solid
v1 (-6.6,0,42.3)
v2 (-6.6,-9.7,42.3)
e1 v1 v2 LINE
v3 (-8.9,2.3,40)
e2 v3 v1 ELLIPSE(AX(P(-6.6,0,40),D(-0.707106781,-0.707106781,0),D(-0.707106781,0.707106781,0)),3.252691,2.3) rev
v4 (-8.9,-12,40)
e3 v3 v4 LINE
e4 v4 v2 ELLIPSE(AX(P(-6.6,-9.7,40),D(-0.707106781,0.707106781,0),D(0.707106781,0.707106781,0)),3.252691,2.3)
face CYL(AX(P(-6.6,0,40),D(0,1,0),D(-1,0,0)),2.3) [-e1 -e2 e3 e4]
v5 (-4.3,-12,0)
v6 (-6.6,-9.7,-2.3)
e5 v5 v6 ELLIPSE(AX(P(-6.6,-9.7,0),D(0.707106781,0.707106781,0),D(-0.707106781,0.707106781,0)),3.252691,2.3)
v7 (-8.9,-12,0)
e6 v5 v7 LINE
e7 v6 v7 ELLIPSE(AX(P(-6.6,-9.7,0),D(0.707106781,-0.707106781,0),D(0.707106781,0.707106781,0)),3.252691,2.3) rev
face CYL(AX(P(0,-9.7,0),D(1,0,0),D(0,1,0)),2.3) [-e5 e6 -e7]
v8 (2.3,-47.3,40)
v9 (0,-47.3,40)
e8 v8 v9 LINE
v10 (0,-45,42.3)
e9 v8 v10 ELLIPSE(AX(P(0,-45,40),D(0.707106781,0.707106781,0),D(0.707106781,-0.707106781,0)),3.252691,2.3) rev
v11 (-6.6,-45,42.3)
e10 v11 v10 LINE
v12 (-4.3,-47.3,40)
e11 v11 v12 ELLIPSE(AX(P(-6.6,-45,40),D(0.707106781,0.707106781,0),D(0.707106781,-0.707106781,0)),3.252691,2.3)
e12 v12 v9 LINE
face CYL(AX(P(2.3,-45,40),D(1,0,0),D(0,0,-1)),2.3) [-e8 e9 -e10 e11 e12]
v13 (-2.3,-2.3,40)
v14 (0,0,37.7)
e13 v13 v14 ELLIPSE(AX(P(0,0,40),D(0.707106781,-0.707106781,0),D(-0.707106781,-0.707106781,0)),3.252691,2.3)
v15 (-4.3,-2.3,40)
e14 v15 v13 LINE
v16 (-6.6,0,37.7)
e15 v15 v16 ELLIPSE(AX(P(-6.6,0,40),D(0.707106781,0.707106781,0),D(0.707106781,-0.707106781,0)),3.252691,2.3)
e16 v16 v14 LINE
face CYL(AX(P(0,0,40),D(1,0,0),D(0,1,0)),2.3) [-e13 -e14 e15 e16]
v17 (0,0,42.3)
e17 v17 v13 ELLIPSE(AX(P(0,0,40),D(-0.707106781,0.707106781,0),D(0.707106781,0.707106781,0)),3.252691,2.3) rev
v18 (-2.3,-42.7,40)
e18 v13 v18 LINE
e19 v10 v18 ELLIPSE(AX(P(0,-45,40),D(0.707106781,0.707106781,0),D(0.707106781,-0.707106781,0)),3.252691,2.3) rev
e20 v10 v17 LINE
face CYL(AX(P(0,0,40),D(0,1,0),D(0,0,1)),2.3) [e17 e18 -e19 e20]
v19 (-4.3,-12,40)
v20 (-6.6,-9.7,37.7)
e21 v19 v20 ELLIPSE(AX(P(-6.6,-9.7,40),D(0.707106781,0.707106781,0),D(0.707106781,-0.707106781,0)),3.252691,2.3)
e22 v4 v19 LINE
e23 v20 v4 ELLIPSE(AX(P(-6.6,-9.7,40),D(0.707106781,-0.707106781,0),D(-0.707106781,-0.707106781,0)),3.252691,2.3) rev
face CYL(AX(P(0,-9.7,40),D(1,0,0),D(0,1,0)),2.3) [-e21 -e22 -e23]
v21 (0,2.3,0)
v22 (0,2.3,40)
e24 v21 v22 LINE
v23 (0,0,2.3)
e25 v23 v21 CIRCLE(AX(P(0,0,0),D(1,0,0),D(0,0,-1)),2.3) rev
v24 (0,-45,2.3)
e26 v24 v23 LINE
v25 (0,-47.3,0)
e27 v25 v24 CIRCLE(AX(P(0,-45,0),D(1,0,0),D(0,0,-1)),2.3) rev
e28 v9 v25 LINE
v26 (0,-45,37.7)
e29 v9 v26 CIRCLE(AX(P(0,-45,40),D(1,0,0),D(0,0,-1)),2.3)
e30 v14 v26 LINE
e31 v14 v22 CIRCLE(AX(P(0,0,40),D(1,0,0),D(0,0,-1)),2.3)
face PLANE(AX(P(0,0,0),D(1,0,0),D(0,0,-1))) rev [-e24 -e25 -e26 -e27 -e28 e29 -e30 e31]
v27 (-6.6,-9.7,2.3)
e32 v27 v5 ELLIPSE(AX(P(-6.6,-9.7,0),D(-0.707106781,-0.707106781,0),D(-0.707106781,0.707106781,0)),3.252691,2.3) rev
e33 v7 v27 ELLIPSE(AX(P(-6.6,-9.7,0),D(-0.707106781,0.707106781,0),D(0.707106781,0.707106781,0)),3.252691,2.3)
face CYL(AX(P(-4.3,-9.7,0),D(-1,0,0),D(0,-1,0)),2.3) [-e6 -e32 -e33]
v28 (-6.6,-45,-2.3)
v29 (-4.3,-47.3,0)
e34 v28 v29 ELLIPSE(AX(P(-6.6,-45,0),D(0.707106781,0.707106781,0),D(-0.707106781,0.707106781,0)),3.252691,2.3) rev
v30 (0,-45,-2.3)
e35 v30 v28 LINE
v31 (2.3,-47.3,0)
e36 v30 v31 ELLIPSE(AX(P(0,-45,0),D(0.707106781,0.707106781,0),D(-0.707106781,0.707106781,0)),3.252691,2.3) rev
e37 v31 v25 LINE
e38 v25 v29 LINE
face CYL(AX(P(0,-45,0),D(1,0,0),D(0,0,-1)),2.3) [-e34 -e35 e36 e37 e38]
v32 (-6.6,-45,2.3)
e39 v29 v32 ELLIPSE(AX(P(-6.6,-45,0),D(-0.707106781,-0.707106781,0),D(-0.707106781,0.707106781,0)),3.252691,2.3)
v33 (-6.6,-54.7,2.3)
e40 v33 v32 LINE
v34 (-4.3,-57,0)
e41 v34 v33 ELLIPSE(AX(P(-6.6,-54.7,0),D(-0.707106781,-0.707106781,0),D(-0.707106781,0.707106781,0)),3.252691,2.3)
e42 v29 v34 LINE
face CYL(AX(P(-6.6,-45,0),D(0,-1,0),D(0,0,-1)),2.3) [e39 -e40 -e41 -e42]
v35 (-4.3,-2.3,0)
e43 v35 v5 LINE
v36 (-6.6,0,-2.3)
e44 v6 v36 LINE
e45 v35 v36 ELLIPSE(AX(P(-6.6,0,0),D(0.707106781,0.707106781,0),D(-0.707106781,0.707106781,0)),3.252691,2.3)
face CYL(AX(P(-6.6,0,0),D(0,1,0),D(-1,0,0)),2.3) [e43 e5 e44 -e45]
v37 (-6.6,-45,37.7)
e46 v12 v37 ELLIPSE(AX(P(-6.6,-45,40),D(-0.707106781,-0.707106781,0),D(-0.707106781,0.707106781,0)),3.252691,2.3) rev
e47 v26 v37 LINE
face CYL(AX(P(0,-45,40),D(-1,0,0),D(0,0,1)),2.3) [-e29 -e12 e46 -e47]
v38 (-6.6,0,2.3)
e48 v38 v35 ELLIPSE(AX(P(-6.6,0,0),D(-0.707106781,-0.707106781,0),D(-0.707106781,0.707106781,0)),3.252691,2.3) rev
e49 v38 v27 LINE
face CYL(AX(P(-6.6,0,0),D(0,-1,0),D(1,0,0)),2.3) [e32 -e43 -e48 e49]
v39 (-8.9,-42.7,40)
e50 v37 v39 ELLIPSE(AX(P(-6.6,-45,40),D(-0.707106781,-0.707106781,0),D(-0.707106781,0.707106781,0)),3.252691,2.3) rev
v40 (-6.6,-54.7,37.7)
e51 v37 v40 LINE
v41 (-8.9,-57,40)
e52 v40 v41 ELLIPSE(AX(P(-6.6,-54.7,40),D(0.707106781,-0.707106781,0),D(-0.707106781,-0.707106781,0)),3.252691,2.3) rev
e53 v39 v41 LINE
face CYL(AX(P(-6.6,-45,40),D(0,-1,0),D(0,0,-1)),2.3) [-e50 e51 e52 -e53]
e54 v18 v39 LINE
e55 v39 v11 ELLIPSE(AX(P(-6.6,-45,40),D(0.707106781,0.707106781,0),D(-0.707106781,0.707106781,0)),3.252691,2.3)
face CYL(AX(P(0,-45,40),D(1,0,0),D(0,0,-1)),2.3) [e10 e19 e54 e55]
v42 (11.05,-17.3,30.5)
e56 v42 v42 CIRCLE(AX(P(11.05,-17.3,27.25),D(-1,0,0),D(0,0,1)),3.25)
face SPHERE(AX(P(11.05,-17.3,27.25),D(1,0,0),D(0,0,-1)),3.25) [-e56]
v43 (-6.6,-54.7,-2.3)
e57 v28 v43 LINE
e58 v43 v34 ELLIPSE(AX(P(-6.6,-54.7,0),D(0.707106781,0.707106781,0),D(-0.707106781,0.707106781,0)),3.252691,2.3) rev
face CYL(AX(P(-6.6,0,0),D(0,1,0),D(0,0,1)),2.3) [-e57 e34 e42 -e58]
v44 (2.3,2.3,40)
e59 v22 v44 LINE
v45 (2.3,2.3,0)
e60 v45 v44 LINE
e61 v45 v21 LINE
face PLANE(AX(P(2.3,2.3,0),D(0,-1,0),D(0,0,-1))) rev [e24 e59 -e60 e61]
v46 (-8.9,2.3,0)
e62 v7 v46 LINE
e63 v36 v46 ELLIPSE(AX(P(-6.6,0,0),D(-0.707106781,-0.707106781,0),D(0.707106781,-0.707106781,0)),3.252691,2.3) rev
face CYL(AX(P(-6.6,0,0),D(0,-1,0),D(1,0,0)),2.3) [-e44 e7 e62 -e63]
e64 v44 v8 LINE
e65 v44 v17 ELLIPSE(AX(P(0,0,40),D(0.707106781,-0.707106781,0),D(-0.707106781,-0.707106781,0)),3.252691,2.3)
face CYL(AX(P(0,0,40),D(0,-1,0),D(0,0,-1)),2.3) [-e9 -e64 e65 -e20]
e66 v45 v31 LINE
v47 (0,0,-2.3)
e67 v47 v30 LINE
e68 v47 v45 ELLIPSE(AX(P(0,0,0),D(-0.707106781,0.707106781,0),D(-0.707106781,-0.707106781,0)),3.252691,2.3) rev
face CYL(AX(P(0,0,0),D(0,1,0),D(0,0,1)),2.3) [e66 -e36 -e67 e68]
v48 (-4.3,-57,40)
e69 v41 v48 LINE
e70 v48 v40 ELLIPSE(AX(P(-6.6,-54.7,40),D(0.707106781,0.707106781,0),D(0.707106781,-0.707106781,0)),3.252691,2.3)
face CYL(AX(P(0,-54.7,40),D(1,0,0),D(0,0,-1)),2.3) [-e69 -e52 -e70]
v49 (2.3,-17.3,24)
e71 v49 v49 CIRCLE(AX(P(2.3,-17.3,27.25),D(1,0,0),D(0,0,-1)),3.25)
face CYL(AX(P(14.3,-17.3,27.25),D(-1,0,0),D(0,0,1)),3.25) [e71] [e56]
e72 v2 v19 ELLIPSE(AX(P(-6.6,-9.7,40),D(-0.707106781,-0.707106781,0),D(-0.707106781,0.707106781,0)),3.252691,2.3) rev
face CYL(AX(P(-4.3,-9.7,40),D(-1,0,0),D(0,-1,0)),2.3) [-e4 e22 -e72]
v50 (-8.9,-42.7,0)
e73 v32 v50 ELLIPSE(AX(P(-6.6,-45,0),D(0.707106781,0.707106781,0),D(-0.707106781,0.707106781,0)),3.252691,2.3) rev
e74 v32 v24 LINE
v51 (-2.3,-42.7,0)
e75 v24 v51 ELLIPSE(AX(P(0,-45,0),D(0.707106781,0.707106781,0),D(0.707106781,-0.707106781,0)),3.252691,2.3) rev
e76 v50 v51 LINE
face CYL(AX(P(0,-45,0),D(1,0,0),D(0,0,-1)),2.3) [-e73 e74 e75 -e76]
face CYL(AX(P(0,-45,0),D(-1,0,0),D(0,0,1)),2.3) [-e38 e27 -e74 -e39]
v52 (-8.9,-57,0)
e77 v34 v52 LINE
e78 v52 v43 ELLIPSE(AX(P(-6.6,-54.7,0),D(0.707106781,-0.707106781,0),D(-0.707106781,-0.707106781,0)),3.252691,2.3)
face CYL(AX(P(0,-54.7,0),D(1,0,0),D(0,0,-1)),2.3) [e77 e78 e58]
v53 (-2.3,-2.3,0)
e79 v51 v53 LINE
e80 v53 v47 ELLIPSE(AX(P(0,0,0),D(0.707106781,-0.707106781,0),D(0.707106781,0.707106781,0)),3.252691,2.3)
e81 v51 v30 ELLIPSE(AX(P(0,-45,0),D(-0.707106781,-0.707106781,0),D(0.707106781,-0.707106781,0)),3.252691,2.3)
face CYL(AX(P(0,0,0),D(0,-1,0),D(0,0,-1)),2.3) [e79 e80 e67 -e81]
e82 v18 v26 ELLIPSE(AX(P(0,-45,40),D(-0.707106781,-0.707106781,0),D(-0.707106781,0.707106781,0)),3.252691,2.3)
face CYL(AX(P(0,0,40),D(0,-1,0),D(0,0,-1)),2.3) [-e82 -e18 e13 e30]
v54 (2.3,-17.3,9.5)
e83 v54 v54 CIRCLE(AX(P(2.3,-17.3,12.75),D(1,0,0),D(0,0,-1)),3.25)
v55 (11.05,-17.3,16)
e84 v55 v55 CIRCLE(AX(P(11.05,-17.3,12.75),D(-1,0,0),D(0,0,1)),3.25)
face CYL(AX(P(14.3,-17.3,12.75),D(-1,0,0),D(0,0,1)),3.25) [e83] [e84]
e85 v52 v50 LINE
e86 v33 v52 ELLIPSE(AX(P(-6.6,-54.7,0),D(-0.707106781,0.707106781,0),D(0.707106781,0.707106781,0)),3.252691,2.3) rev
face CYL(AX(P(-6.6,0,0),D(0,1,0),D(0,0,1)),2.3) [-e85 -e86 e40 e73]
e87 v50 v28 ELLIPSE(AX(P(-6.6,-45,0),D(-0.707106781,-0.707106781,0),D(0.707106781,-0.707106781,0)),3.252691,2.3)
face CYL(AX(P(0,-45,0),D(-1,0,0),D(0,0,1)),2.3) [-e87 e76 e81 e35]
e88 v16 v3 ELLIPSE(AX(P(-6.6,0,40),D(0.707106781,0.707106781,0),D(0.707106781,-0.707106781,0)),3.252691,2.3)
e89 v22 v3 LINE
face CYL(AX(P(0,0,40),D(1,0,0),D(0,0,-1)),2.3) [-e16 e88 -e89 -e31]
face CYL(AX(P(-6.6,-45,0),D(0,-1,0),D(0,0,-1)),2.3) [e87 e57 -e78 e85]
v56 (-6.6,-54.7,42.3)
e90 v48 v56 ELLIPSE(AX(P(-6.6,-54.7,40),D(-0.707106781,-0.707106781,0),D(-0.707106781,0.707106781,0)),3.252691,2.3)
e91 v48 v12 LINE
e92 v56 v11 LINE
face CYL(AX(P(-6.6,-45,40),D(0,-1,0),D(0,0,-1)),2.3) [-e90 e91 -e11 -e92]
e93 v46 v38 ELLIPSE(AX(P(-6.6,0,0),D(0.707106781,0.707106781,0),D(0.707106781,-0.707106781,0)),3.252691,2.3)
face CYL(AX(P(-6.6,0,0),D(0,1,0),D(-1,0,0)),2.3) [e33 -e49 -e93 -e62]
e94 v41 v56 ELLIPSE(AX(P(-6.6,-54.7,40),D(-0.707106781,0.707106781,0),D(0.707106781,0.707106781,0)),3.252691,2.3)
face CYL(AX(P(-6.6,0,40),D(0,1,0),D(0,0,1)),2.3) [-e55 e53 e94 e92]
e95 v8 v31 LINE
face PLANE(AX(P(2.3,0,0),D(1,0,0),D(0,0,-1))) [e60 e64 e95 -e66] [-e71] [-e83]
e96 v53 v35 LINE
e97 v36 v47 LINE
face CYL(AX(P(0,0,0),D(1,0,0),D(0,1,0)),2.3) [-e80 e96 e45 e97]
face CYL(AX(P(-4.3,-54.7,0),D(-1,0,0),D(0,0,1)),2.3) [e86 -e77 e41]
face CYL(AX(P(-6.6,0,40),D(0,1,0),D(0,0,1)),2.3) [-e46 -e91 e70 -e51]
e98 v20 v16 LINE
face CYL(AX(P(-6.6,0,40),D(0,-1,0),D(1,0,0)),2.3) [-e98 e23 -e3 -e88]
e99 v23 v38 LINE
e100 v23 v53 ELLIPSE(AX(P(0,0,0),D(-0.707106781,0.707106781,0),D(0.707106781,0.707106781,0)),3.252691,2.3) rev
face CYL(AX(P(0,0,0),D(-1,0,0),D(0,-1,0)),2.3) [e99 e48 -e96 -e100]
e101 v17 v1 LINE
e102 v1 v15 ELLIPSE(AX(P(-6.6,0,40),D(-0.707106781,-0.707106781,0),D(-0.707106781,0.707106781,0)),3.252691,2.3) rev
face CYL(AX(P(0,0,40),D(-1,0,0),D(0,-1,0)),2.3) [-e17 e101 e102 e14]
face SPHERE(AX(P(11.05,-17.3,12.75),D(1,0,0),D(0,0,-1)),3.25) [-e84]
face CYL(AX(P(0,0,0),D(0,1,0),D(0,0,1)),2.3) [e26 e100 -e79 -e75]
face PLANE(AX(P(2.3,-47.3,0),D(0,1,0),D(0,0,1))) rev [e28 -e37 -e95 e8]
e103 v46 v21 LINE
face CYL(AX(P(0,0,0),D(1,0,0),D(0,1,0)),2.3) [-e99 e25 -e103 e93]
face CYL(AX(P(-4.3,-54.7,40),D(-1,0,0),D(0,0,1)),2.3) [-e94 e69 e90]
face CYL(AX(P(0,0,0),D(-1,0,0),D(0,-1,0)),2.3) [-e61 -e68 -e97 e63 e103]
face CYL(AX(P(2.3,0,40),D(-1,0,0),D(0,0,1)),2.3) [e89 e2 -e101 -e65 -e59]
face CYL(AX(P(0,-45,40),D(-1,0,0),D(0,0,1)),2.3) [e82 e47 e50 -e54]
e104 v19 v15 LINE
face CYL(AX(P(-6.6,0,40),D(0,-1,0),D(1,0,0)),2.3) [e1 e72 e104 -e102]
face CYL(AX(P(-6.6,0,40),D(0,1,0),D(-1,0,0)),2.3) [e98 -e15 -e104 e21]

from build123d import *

# Parameters (mm, degrees)
EXTRU_MINCE1_DEPTH         = 2.3
CONG_1_R                   = 2.3
ESQUISSE2_W                = 40
ESQUISSE2_H                = 49.6
BOSS_EXTRU_1_DEPTH         = 2.3
R_P_TITION_LIN_AIRE1_COUNT = 2
R_P_TITION_LIN_AIRE1_PITCH = 40
CONG_2_R                   = 2.3
ESQUISSE3_R                = 3.25
BOSS_EXTRU_2_DEPTH         = 12
CONG_3_R                   = 3.25


with BuildPart() as part:
    # Esquisse1 → Extru.-Mince1 (new, symmetric)
    with BuildSketch(Plane.XY):
        Polygon((-4.3, -57), (-4.3, -47.3), (2.3, -47.3), (2.3, 2.3), (-8.9, 2.3), (-8.9, -12), (-4.3, -12), (-4.3, -2.3), (-2.3, -2.3), (-2.3, -42.7), (-8.9, -42.7), (-8.9, -57), align=None)
    extru_mince1 = extrude(amount=EXTRU_MINCE1_DEPTH, both=True)

    # Congé1
    cong_1_edges = [part.edges().sort_by_distance(p)[0] for p in [
        (-6.6, -57, -2.3),
        (-4.3, -52.15, -2.3),
        (-1, -47.3, -2.3),
        (2.3, -22.5, -2.3),
        (-3.3, 2.3, -2.3),
        (-8.9, -4.85, -2.3),
        (-6.6, -12, -2.3),
        (-4.3, -7.15, -2.3),
        (-3.3, -2.3, -2.3),
        (-2.3, -22.5, -2.3),
        (-5.6, -42.7, -2.3),
        (-8.9, -49.85, -2.3),
        (-5.6, -42.7, 2.3),
        (-2.3, -22.5, 2.3),
        (-3.3, -2.3, 2.3),
        (-4.3, -7.15, 2.3),
        (-6.6, -12, 2.3),
        (-8.9, -4.85, 2.3),
        (-3.3, 2.3, 2.3),
        (2.3, -22.5, 2.3),
        (-1, -47.3, 2.3),
        (-4.3, -52.15, 2.3),
        (-6.6, -57, 2.3),
        (-8.9, -49.85, 2.3),
    ]]
    fillet(cong_1_edges, radius=CONG_1_R - 0.0001)  # a hair under: the kernel refuses the full size

    # Esquisse2 → Boss.-Extru.1 (add)
    with BuildSketch(Plane(origin=(0, 0, 0), x_dir=(0, 0, -1), z_dir=(1, 0, 0))):
        with Locations((-20, -22.5)):
            Rectangle(ESQUISSE2_W, ESQUISSE2_H)
    extrude(amount=BOSS_EXTRU_1_DEPTH)

    # Répétition linéaire1: Extru.-Mince1 ×2
    with Locations(*[(0, 0, i * R_P_TITION_LIN_AIRE1_PITCH) for i in range(1, R_P_TITION_LIN_AIRE1_COUNT)]):
        add(extru_mince1)

    # Congé2
    cong_2_edges = [part.edges().sort_by_distance(p)[0] for p in [
        (-5.6, -42.7, 42.3),
        (-2.3, -22.5, 42.3),
        (-3.3, -2.3, 42.3),
        (-4.3, -7.15, 42.3),
        (-6.6, -12, 42.3),
        (-8.9, -4.85, 42.3),
        (-3.3, 2.3, 42.3),
        (2.3, -22.5, 42.3),
        (-1, -47.3, 42.3),
        (-4.3, -52.15, 42.3),
        (-6.6, -57, 42.3),
        (-8.9, -49.85, 42.3),
        (-2.15, -47.3, 37.7),
        (-4.3, -52.15, 37.7),
        (-6.6, -57, 37.7),
        (-8.9, -49.85, 37.7),
        (-5.6, -42.7, 37.7),
        (-2.3, -22.5, 37.7),
        (-3.3, -2.3, 37.7),
        (-4.3, -7.15, 37.7),
        (-6.6, -12, 37.7),
        (-8.9, -4.85, 37.7),
        (-4.45, 2.3, 37.7),
    ]]
    fillet(cong_2_edges, radius=CONG_2_R - 0.0001)  # a hair under: the kernel refuses the full size

    # Esquisse3 → Boss.-Extru.2 (add)
    with BuildSketch(Plane(origin=(2.3, 0, 0), x_dir=(0, 0, -1), z_dir=(1, 0, 0))):
        with Locations((-27.25, -17.3)):
            Circle(ESQUISSE3_R)
        with Locations((-12.75, -17.3)):
            Circle(ESQUISSE3_R)
    extrude(amount=BOSS_EXTRU_2_DEPTH)

    # Congé3
    cong_3_edges = [part.edges().sort_by_distance(p)[0] for p in [
        (14.3, -17.3, 30.5),
        (14.3, -17.3, 16),
    ]]
    fillet(cong_3_edges, radius=CONG_3_R)


solid = part.part
